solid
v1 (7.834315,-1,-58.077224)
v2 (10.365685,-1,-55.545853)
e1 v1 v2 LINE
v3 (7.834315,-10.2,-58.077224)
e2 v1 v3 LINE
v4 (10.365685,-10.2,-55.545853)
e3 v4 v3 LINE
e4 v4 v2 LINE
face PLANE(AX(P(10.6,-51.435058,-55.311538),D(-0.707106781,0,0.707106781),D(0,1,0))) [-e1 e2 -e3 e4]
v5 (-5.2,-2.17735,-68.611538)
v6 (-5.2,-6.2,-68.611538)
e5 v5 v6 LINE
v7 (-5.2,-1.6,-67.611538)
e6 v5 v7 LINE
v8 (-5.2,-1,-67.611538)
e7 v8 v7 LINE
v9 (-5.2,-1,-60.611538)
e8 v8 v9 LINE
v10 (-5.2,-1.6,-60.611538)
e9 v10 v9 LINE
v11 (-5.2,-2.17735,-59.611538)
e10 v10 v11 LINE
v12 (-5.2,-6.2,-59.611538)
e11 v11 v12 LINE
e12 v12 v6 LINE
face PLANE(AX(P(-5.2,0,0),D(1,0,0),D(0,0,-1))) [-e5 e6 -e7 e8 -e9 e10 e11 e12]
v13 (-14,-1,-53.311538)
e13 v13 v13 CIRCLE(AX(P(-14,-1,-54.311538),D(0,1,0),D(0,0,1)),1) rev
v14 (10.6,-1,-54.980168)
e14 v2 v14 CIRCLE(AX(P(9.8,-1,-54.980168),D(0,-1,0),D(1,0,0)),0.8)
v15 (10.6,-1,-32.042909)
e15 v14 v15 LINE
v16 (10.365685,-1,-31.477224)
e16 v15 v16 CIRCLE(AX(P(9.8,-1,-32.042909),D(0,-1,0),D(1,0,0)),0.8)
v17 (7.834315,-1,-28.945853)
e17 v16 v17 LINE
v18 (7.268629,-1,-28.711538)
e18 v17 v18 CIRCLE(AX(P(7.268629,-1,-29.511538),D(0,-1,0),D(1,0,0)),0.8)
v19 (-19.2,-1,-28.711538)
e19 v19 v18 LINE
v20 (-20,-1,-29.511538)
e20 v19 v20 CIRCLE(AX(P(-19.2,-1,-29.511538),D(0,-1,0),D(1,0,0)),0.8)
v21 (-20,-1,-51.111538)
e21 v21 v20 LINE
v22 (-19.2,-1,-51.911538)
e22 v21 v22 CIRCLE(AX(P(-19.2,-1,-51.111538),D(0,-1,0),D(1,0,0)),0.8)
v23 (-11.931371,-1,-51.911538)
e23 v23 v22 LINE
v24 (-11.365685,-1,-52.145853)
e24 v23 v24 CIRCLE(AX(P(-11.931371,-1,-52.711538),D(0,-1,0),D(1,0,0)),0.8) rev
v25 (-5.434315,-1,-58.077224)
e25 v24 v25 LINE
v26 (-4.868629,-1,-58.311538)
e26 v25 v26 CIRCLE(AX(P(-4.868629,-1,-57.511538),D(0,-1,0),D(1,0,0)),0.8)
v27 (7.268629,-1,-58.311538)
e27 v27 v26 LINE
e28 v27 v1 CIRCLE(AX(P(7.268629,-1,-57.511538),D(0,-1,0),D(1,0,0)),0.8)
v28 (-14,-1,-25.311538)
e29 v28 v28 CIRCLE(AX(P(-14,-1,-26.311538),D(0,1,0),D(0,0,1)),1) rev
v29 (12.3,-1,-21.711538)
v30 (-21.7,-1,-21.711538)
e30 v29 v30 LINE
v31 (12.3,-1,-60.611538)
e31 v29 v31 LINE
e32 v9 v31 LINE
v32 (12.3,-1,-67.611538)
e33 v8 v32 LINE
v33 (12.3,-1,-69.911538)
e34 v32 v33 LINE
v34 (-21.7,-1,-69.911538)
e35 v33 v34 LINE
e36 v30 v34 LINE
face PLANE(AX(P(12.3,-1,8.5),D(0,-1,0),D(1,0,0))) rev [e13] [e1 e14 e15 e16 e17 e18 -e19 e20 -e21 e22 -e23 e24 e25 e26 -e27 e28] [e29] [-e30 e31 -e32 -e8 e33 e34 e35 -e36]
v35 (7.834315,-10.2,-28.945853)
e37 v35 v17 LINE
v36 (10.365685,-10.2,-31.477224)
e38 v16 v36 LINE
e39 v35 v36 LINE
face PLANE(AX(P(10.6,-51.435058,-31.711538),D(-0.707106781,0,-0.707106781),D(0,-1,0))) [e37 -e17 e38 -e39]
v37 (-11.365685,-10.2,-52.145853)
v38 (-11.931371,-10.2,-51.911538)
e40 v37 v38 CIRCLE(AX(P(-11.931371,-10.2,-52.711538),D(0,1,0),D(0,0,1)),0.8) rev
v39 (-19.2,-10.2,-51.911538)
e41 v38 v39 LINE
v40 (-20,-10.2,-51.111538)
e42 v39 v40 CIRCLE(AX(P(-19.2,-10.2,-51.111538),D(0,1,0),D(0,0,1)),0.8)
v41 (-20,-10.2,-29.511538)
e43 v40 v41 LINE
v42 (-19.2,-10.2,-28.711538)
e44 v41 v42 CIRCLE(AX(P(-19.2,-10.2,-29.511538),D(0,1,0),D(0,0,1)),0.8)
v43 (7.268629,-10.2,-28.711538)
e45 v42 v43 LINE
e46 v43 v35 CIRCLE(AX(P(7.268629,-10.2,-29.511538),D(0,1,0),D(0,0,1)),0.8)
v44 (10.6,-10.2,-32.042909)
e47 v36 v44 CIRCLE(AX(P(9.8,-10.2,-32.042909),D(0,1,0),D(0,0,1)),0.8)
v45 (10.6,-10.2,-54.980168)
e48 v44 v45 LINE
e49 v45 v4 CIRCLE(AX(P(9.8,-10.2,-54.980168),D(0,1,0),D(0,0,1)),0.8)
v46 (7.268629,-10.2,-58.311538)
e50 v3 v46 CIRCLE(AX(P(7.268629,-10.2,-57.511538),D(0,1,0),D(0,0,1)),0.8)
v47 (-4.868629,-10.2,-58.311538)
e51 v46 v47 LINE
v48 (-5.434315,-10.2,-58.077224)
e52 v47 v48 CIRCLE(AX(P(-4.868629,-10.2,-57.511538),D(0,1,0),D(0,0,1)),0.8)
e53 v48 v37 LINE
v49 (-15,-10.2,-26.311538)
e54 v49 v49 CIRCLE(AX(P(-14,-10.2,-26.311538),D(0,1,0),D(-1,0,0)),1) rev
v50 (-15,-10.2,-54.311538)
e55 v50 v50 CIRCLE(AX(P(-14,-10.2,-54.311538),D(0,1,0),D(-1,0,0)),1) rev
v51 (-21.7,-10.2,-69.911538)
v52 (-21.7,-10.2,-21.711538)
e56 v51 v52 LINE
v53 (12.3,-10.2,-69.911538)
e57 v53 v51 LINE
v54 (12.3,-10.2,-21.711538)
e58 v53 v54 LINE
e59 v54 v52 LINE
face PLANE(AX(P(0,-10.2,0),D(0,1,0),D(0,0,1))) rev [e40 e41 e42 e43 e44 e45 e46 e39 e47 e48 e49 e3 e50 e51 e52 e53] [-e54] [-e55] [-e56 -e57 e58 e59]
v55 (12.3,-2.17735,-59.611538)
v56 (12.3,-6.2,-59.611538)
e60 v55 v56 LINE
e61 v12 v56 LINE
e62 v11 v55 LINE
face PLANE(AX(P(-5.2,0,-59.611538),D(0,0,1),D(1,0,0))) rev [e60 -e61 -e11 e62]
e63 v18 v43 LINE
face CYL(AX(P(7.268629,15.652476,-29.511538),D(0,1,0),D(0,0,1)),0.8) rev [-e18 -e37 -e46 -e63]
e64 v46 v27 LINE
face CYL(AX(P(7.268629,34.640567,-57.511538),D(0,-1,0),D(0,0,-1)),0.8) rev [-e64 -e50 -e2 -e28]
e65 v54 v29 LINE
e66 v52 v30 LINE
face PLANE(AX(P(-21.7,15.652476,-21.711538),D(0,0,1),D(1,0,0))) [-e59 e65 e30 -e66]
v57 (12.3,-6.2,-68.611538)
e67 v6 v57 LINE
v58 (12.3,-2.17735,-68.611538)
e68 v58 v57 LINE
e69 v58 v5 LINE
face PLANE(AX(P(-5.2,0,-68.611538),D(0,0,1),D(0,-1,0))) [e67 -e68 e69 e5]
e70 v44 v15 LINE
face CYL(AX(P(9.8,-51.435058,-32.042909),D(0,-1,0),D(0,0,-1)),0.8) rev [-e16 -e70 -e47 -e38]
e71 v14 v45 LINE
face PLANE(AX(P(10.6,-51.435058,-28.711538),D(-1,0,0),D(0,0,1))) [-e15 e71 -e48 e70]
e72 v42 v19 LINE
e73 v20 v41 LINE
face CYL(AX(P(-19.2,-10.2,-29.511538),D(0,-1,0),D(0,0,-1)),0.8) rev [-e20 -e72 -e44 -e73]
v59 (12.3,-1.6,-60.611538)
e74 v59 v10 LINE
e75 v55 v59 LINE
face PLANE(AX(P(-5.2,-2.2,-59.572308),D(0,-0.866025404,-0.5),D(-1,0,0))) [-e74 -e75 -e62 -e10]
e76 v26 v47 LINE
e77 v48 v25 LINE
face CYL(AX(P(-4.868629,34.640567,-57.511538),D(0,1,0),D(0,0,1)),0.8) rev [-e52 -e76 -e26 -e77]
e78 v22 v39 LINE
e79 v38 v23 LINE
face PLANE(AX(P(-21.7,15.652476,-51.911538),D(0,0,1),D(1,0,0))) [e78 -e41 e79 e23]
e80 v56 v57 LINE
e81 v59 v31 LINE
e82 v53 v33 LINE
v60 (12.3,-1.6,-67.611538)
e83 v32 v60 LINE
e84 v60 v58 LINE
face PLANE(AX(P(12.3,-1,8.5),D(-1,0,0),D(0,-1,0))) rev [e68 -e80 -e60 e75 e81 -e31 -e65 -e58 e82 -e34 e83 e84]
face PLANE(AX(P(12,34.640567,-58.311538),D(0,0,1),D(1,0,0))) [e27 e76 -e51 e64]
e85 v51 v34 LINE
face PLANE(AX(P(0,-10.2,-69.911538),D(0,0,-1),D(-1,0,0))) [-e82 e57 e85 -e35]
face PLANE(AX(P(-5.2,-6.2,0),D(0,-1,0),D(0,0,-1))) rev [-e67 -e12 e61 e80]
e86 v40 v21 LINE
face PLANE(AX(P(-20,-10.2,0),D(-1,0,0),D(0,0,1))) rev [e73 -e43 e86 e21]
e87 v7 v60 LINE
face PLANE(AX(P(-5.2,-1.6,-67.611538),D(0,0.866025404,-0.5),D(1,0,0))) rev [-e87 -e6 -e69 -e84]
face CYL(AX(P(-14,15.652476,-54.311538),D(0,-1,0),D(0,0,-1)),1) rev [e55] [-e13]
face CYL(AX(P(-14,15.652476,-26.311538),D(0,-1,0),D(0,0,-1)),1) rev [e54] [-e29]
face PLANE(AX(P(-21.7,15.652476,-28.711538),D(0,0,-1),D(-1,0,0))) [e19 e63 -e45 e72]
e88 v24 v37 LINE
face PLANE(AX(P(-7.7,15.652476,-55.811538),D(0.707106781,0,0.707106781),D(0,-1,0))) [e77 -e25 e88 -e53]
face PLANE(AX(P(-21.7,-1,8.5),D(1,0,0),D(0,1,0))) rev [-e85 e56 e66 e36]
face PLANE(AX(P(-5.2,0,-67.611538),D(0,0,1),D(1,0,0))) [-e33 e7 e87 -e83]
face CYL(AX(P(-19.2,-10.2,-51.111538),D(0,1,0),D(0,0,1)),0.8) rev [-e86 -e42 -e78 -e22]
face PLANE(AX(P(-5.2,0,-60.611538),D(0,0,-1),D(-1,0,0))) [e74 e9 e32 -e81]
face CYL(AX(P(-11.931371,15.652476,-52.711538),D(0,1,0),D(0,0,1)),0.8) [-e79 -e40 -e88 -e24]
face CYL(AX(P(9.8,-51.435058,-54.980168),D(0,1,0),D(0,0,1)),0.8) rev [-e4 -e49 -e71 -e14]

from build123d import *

# Parameters (mm, degrees)
BOSS_EXTRUDE1_START      = -1
SKETCH1_W                = 1.7
SKETCH1_H                = 89.2
BOSS_EXTRUDE1_DEPTH      = 9.2
SKETCH4_W                = 33.7
SKETCH4_H                = 11.6
BOSS_EXTRUDE3_DEPTH      = 9.2
SERVO_HOLDER_DEPTH       = 1
SERVO_HOLDER_DEPTH_BACK  = 9.2
SKETCH3_W                = 14
SKETCH3_H                = 7
SKETCH3_R                = 1
SKETCH37_W               = 20
SKETCH37_H               = 7
BOSS_EXTRUDE19_DEPTH     = 10.2
CUT_EXTRUDE10_DEPTH      = 93.482268571
CUT_EXTRUDE10_DEPTH_BACK = 93.482268571
SKETCH29_W               = 34.409909993
SKETCH29_H               = 5.977389624
BOSS_EXTRUDE13_START     = 2
SKETCH30_W               = 34
SKETCH30_H               = 38
SKETCH30_R               = 1.6
BOSS_EXTRUDE13_DEPTH     = 6.5
SKETCH41_W               = 17.288461538
SKETCH41_H               = 9.2
CUT_EXTRUDE14_DEPTH      = 15
BOSS_EXTRUDE14_START     = -38
SKETCH32_R               = 1.45
SKETCH32_R_2             = 5
BOSS_EXTRUDE14_DEPTH     = 8.8
BOSS_EXTRUDE16_DEPTH     = 3
BOSS_EXTRUDE17_DEPTH     = 3
BOSS_EXTRUDE18_START     = -9.2
BOSS_EXTRUDE18_DEPTH     = 9.2
SKETCH39_W               = 1.7
SKETCH39_H               = 41.2
BOSS_EXTRUDE20_DEPTH     = 9.2
CUT_EXTRUDE13_DEPTH      = 17.5
CHAMFER2_SIZE            = 0.6
CHAMFER2_SIZE_2          = 1.039230485
CHAMFER3_SIZE            = 3
FILLET10_R               = 6
CUT_EXTRUDE15_DEPTH      = 10
CHAMFER4_SIZE            = 2.5
CUT_EXTRUDE16_DEPTH      = 10
FILLET11_R               = 0.8
SKETCH44_W               = 59.192885725
SKETCH44_H               = 45.417181718
CUT_EXTRUDE17_DEPTH      = 87.948983376


with BuildPart() as part:
    # Sketch1 → Boss-Extrude1 (new body)
    with BuildSketch(Plane(origin=(0, 0, 0), x_dir=(1, 0, 0), z_dir=(0, 1, 0)).offset(BOSS_EXTRUDE1_START)):
        with Locations((-20.85, 25.311538462)):
            Rectangle(SKETCH1_W, SKETCH1_H)
    extrude(amount=-BOSS_EXTRUDE1_DEPTH)

    # Sketch4 → Boss-Extrude3 (add)
    with BuildSketch(Plane.XZ.offset(10.2)):
        with Locations((-4.85, -64.111538462)):
            Rectangle(SKETCH4_W, SKETCH4_H)
    extrude(amount=-BOSS_EXTRUDE3_DEPTH)

    # Sketch3 → Servo Holder (add, two sides: drawn at the far end of the back side and taken through both)
    # profile 1 of 2: a face of its own
    with BuildSketch(Plane.XZ.offset(10.2).offset(-SERVO_HOLDER_DEPTH_BACK)):
        with Locations((-14.7, -55.411538462)):
            Rectangle(SKETCH3_W, SKETCH3_H)
        with Locations(Location((-14, -54.311538462, 0), (0, 0, 270))):
            Circle(SKETCH3_R, mode=Mode.SUBTRACT)
    # profile 2 of 2: a face of its own
    with BuildSketch(Plane.XZ.offset(10.2).offset(-SERVO_HOLDER_DEPTH_BACK)):
        with Locations((-14.7, -25.211538462)):
            Rectangle(SKETCH3_W, SKETCH3_H)
        with Locations(Location((-14, -26.311538462, 0), (0, 0, 90))):
            Circle(SKETCH3_R, mode=Mode.SUBTRACT)
    extrude(amount=SERVO_HOLDER_DEPTH + SERVO_HOLDER_DEPTH_BACK)

    # Sketch37 → Boss-Extrude19 (add)
    with BuildSketch(Plane(origin=(0, -1, 0), x_dir=(1, 0, 0), z_dir=(0, 1, 0))):
        with Locations((2.3, 25.211538462)):
            Rectangle(SKETCH37_W, SKETCH37_H)
    extrude(amount=-BOSS_EXTRUDE19_DEPTH)

    # Sketch29 → Cut-Extrude10 (cut, two sides: drawn at the far end of the back side and taken through both)
    with BuildSketch(Plane(origin=(0, 0, -69.911538462), x_dir=(-1, 0, 0), z_dir=(0, 0, -1)).offset(-CUT_EXTRUDE10_DEPTH_BACK)):
        with Locations((4.495045004, -13.188694812)):
            Rectangle(SKETCH29_W, SKETCH29_H)
    extrude(amount=CUT_EXTRUDE10_DEPTH + CUT_EXTRUDE10_DEPTH_BACK, mode=Mode.SUBTRACT)


with BuildPart() as body_2:
    # Sketch30 → Boss-Extrude13 (new body)
    with BuildSketch(Plane.XY.offset(BOSS_EXTRUDE13_START)):
        with Locations((-4.7, -20)):
            Rectangle(SKETCH30_W, SKETCH30_H)
        with Locations(Location((5.3, -34, 0), (0, 0, 180))):
            Circle(SKETCH30_R, mode=Mode.SUBTRACT)
        with Locations(Location((5.3, -19, 0), (0, 0, 180))):
            Circle(SKETCH30_R, mode=Mode.SUBTRACT)
        with Locations(Location((-14.7, -34, 0), (0, 0, 180))):
            Circle(SKETCH30_R, mode=Mode.SUBTRACT)
        with Locations(Location((-14.7, -19, 0), (0, 0, 180))):
            Circle(SKETCH30_R, mode=Mode.SUBTRACT)
    extrude(amount=BOSS_EXTRUDE13_DEPTH)


with BuildPart() as cut_extrude14_tool:
    # Sketch41 → Cut-Extrude14 (new body)
    with BuildSketch(Plane(origin=(-20, 0, 0), x_dir=(0, 0, -1), z_dir=(1, 0, 0))):
        with Locations((-10.644230769, -5.6)):
            Rectangle(SKETCH41_W, SKETCH41_H)
    extrude(amount=-CUT_EXTRUDE14_DEPTH)


with BuildPart() as part_1:
    add(part.part)

    # Cut-Extrude14: cut by cut_extrude14_tool
    add(cut_extrude14_tool.part, mode=Mode.SUBTRACT)



with BuildPart() as body_2_1:
    add(body_2.part)

    # Cut-Extrude14: cut by cut_extrude14_tool
    add(cut_extrude14_tool.part, mode=Mode.SUBTRACT)

    # Sketch32 → Boss-Extrude14 (add)
    with BuildSketch(Plane.XZ.offset(39).offset(BOSS_EXTRUDE14_START)):
        with BuildLine():
            ThreePointArc((11.872921748, 2), (25.925390485, -3.535644523), (35.05, 8.5))
            ThreePointArc((35.05, 8.5), (22.55, 21), (10.05, 8.5))
            Line((10.05, 8.5), (12.3, 8.5))
            Line((12.3, 8.5), (12.3, 2))
            Line((12.3, 2), (11.872921748, 2))
        make_face()
        with Locations(Location((15.25884337, 2.409923235, 0), (0, 0, 180))):
            Circle(SKETCH32_R, mode=Mode.SUBTRACT)
        with Locations(Location((28.640076765, 1.20884337, 0), (0, 0, 180))):
            Circle(SKETCH32_R, mode=Mode.SUBTRACT)
        with Locations(Location((16.459923235, 15.79115663, 0), (0, 0, 180))):
            Circle(SKETCH32_R, mode=Mode.SUBTRACT)
        with Locations(Location((22.55, 8.5, 0), (0, 0, 180))):
            Circle(SKETCH32_R_2, mode=Mode.SUBTRACT)
        with Locations(Location((29.84115663, 14.590076765, 0), (0, 0, 180))):
            Circle(SKETCH32_R, mode=Mode.SUBTRACT)
    extrude(amount=BOSS_EXTRUDE14_DEPTH)


with BuildPart() as part_2:
    add(part_1.part)

    add(body_2_1.part)  # Boss-Extrude16 merges body 2
    # Sketch34 → Boss-Extrude16 (add)
    with BuildSketch(Plane.ZY.offset(21.7)):
        Polygon((-21.711538462, -1), (-21.711538462, -9.8), (2, -39), (8.5, -39), (8.5, -1), align=None)
    extrude(amount=-BOSS_EXTRUDE16_DEPTH)

    # Sketch35 → Boss-Extrude17 (add)
    with BuildSketch(Plane(origin=(12.3, 0, 0), x_dir=(0, 0, -1), z_dir=(1, 0, 0))):
        Polygon((-2, -1), (21.711538462, -1), (21.711538462, -9.8), (-2, -39), (-8.5, -39), (-8.5, -9.8), (-8.5, -1), align=None)
    extrude(amount=-BOSS_EXTRUDE17_DEPTH)

    # Sketch36 → Boss-Extrude18 (add)
    with BuildSketch(Plane.XZ.offset(10.2).offset(BOSS_EXTRUDE18_START)):
        Polygon((12.3, -10.579162849), (16.63422252, -2.511520186), (12.3, 1.345455989), align=None)
    extrude(amount=BOSS_EXTRUDE18_DEPTH)

    # Sketch39 → Boss-Extrude20 (add)
    with BuildSketch(Plane(origin=(0, -1, 0), x_dir=(1, 0, 0), z_dir=(0, 1, 0))):
        with Locations((11.45, 49.311538462)):
            Rectangle(SKETCH39_W, SKETCH39_H)
    extrude(amount=-BOSS_EXTRUDE20_DEPTH)

    # Sketch40 → Cut-Extrude13 (cut)
    with BuildSketch(Plane(origin=(12.3, 0, 0), x_dir=(0, 0, -1), z_dir=(1, 0, 0))):
        Polygon((64.111538462, -1), (60.611538462, -1), (60.611538462, -2.2), (59.611538462, -2.2), (59.611538462, -6.2), (64.111538462, -6.2), align=None)
        Polygon((67.611538462, -1), (64.111538462, -1), (64.111538462, -6.2), (68.611538462, -6.2), (68.611538462, -2.2), (67.611538462, -2.2), align=None)
    extrude(amount=-CUT_EXTRUDE13_DEPTH, mode=Mode.SUBTRACT)

    # Chamfer2
    # the kernel refuses this chamfer: 1.039230485, 0.6 mm, written as the material it takes off along each edge
    with BuildSketch(Plane(origin=(14.988578382, -2.2, -67.611538462), x_dir=(0, 0.9983227437537925, 0.05789386240267319), z_dir=(-1, 0, 0))) as chamfer2_piece_1_section:
        Polygon((CHAMFER2_SIZE * 0.998322743754, CHAMFER2_SIZE * 0.0578938624027), (-CHAMFER2_SIZE_2 * 0.0578938623771, CHAMFER2_SIZE_2 * 0.998322743313), (0, 0), align=None)
    chamfer2_piece_1 = extrude(amount=20.188578382, mode=Mode.PRIVATE)
    chamfer2_piece_1 = split(chamfer2_piece_1, bisect_by=Plane(origin=(4.894289191, -2.005782009, -68.611538462), z_dir=(0, 0, 1)), keep=Keep.TOP, mode=Mode.PRIVATE)
    add(chamfer2_piece_1, mode=Mode.SUBTRACT)
    with BuildSketch(Plane(origin=(14.988578382, -2.2, -60.611538462), x_dir=(0, 0.9983227437537925, -0.05789386240267317), z_dir=(-1, 0, 0))) as chamfer2_piece_2_section:
        Polygon((CHAMFER2_SIZE * 0.998322743754, -CHAMFER2_SIZE * 0.0578938624027), (-CHAMFER2_SIZE_2 * 0.0578938623771, -CHAMFER2_SIZE_2 * 0.998322743313), (0, 0), align=None)
    chamfer2_piece_2 = extrude(amount=20.188578382, mode=Mode.PRIVATE)
    chamfer2_piece_2 = split(chamfer2_piece_2, bisect_by=Plane(origin=(4.894289191, -2.005782009, -59.611538462), z_dir=(0, 0, -1)), keep=Keep.TOP, mode=Mode.PRIVATE)
    add(chamfer2_piece_2, mode=Mode.SUBTRACT)

    # Chamfer3
    chamfer3_edges = [part_2.edges().sort_by_distance(p)[0] for p in [
        (10.6, -5.6, -58.311538462),
        (10.6, -5.6, -28.711538462),
    ]]
    chamfer(chamfer3_edges, length=CHAMFER3_SIZE)

    # Fillet10
    fillet10_edges = [part_2.edges().sort_by_distance(p)[0] for p in [
        (16.63422252, -5.4, -2.511520186),
        (12.3, -5.6, -10.579162849),
    ]]
    fillet(fillet10_edges, radius=FILLET10_R)

    # Sketch42 → Cut-Extrude15 (cut)
    with BuildSketch(Plane.XY.offset(8.5)):
        with BuildLine():
            Line((-1.1, -1), (-1.1, -10.6))
            ThreePointArc((-1.1, -10.6), (-4.7, -14.2), (-8.3, -10.6))
            Line((-8.3, -10.6), (-8.3, -1))
            Line((-8.3, -1), (-1.1, -1))
        make_face()
    extrude(amount=-CUT_EXTRUDE15_DEPTH, mode=Mode.SUBTRACT)

    # Chamfer4
    chamfer4_edges = [part_2.edges().sort_by_distance(p)[0] for p in [
        (-7.7, -5.6, -58.311538462),
    ]]
    chamfer(chamfer4_edges, length=CHAMFER4_SIZE)

    # Sketch43 → Cut-Extrude16 (cut)
    with BuildSketch(Plane(origin=(0, -1, 0), x_dir=(1, 0, 0), z_dir=(0, 1, 0))):
        Polygon((-5.2, 58.311538462), (-11.6, 51.911538462), (-5.2, 51.911538462), align=None)
    extrude(amount=-CUT_EXTRUDE16_DEPTH, mode=Mode.SUBTRACT)

    # Fillet11
    fillet11_edges = [part_2.edges().sort_by_distance(p)[0] for p in [
        (-20, -5.6, -28.711538462),
        (-20, -5.6, -51.911538462),
        (10.6, -5.6, -55.311538462),
        (10.6, -5.6, -31.711538462),
        (7.6, -5.6, -28.711538462),
        (7.6, -5.6, -58.311538462),
        (-5.2, -5.6, -58.311538462),
        (-11.6, -5.6, -51.911538462),
    ]]
    fillet(fillet11_edges, radius=FILLET11_R)

    # Sketch44 → Cut-Extrude17 (cut, through all)
    with BuildSketch(Plane(origin=(0, -1, 0), x_dir=(1, 0, 0), z_dir=(0, 1, 0))):
        with Locations((7.896442862, -0.997052397)):
            Rectangle(SKETCH44_W, SKETCH44_H)
    extrude(amount=-CUT_EXTRUDE17_DEPTH, mode=Mode.SUBTRACT)


solid = part_2.part
